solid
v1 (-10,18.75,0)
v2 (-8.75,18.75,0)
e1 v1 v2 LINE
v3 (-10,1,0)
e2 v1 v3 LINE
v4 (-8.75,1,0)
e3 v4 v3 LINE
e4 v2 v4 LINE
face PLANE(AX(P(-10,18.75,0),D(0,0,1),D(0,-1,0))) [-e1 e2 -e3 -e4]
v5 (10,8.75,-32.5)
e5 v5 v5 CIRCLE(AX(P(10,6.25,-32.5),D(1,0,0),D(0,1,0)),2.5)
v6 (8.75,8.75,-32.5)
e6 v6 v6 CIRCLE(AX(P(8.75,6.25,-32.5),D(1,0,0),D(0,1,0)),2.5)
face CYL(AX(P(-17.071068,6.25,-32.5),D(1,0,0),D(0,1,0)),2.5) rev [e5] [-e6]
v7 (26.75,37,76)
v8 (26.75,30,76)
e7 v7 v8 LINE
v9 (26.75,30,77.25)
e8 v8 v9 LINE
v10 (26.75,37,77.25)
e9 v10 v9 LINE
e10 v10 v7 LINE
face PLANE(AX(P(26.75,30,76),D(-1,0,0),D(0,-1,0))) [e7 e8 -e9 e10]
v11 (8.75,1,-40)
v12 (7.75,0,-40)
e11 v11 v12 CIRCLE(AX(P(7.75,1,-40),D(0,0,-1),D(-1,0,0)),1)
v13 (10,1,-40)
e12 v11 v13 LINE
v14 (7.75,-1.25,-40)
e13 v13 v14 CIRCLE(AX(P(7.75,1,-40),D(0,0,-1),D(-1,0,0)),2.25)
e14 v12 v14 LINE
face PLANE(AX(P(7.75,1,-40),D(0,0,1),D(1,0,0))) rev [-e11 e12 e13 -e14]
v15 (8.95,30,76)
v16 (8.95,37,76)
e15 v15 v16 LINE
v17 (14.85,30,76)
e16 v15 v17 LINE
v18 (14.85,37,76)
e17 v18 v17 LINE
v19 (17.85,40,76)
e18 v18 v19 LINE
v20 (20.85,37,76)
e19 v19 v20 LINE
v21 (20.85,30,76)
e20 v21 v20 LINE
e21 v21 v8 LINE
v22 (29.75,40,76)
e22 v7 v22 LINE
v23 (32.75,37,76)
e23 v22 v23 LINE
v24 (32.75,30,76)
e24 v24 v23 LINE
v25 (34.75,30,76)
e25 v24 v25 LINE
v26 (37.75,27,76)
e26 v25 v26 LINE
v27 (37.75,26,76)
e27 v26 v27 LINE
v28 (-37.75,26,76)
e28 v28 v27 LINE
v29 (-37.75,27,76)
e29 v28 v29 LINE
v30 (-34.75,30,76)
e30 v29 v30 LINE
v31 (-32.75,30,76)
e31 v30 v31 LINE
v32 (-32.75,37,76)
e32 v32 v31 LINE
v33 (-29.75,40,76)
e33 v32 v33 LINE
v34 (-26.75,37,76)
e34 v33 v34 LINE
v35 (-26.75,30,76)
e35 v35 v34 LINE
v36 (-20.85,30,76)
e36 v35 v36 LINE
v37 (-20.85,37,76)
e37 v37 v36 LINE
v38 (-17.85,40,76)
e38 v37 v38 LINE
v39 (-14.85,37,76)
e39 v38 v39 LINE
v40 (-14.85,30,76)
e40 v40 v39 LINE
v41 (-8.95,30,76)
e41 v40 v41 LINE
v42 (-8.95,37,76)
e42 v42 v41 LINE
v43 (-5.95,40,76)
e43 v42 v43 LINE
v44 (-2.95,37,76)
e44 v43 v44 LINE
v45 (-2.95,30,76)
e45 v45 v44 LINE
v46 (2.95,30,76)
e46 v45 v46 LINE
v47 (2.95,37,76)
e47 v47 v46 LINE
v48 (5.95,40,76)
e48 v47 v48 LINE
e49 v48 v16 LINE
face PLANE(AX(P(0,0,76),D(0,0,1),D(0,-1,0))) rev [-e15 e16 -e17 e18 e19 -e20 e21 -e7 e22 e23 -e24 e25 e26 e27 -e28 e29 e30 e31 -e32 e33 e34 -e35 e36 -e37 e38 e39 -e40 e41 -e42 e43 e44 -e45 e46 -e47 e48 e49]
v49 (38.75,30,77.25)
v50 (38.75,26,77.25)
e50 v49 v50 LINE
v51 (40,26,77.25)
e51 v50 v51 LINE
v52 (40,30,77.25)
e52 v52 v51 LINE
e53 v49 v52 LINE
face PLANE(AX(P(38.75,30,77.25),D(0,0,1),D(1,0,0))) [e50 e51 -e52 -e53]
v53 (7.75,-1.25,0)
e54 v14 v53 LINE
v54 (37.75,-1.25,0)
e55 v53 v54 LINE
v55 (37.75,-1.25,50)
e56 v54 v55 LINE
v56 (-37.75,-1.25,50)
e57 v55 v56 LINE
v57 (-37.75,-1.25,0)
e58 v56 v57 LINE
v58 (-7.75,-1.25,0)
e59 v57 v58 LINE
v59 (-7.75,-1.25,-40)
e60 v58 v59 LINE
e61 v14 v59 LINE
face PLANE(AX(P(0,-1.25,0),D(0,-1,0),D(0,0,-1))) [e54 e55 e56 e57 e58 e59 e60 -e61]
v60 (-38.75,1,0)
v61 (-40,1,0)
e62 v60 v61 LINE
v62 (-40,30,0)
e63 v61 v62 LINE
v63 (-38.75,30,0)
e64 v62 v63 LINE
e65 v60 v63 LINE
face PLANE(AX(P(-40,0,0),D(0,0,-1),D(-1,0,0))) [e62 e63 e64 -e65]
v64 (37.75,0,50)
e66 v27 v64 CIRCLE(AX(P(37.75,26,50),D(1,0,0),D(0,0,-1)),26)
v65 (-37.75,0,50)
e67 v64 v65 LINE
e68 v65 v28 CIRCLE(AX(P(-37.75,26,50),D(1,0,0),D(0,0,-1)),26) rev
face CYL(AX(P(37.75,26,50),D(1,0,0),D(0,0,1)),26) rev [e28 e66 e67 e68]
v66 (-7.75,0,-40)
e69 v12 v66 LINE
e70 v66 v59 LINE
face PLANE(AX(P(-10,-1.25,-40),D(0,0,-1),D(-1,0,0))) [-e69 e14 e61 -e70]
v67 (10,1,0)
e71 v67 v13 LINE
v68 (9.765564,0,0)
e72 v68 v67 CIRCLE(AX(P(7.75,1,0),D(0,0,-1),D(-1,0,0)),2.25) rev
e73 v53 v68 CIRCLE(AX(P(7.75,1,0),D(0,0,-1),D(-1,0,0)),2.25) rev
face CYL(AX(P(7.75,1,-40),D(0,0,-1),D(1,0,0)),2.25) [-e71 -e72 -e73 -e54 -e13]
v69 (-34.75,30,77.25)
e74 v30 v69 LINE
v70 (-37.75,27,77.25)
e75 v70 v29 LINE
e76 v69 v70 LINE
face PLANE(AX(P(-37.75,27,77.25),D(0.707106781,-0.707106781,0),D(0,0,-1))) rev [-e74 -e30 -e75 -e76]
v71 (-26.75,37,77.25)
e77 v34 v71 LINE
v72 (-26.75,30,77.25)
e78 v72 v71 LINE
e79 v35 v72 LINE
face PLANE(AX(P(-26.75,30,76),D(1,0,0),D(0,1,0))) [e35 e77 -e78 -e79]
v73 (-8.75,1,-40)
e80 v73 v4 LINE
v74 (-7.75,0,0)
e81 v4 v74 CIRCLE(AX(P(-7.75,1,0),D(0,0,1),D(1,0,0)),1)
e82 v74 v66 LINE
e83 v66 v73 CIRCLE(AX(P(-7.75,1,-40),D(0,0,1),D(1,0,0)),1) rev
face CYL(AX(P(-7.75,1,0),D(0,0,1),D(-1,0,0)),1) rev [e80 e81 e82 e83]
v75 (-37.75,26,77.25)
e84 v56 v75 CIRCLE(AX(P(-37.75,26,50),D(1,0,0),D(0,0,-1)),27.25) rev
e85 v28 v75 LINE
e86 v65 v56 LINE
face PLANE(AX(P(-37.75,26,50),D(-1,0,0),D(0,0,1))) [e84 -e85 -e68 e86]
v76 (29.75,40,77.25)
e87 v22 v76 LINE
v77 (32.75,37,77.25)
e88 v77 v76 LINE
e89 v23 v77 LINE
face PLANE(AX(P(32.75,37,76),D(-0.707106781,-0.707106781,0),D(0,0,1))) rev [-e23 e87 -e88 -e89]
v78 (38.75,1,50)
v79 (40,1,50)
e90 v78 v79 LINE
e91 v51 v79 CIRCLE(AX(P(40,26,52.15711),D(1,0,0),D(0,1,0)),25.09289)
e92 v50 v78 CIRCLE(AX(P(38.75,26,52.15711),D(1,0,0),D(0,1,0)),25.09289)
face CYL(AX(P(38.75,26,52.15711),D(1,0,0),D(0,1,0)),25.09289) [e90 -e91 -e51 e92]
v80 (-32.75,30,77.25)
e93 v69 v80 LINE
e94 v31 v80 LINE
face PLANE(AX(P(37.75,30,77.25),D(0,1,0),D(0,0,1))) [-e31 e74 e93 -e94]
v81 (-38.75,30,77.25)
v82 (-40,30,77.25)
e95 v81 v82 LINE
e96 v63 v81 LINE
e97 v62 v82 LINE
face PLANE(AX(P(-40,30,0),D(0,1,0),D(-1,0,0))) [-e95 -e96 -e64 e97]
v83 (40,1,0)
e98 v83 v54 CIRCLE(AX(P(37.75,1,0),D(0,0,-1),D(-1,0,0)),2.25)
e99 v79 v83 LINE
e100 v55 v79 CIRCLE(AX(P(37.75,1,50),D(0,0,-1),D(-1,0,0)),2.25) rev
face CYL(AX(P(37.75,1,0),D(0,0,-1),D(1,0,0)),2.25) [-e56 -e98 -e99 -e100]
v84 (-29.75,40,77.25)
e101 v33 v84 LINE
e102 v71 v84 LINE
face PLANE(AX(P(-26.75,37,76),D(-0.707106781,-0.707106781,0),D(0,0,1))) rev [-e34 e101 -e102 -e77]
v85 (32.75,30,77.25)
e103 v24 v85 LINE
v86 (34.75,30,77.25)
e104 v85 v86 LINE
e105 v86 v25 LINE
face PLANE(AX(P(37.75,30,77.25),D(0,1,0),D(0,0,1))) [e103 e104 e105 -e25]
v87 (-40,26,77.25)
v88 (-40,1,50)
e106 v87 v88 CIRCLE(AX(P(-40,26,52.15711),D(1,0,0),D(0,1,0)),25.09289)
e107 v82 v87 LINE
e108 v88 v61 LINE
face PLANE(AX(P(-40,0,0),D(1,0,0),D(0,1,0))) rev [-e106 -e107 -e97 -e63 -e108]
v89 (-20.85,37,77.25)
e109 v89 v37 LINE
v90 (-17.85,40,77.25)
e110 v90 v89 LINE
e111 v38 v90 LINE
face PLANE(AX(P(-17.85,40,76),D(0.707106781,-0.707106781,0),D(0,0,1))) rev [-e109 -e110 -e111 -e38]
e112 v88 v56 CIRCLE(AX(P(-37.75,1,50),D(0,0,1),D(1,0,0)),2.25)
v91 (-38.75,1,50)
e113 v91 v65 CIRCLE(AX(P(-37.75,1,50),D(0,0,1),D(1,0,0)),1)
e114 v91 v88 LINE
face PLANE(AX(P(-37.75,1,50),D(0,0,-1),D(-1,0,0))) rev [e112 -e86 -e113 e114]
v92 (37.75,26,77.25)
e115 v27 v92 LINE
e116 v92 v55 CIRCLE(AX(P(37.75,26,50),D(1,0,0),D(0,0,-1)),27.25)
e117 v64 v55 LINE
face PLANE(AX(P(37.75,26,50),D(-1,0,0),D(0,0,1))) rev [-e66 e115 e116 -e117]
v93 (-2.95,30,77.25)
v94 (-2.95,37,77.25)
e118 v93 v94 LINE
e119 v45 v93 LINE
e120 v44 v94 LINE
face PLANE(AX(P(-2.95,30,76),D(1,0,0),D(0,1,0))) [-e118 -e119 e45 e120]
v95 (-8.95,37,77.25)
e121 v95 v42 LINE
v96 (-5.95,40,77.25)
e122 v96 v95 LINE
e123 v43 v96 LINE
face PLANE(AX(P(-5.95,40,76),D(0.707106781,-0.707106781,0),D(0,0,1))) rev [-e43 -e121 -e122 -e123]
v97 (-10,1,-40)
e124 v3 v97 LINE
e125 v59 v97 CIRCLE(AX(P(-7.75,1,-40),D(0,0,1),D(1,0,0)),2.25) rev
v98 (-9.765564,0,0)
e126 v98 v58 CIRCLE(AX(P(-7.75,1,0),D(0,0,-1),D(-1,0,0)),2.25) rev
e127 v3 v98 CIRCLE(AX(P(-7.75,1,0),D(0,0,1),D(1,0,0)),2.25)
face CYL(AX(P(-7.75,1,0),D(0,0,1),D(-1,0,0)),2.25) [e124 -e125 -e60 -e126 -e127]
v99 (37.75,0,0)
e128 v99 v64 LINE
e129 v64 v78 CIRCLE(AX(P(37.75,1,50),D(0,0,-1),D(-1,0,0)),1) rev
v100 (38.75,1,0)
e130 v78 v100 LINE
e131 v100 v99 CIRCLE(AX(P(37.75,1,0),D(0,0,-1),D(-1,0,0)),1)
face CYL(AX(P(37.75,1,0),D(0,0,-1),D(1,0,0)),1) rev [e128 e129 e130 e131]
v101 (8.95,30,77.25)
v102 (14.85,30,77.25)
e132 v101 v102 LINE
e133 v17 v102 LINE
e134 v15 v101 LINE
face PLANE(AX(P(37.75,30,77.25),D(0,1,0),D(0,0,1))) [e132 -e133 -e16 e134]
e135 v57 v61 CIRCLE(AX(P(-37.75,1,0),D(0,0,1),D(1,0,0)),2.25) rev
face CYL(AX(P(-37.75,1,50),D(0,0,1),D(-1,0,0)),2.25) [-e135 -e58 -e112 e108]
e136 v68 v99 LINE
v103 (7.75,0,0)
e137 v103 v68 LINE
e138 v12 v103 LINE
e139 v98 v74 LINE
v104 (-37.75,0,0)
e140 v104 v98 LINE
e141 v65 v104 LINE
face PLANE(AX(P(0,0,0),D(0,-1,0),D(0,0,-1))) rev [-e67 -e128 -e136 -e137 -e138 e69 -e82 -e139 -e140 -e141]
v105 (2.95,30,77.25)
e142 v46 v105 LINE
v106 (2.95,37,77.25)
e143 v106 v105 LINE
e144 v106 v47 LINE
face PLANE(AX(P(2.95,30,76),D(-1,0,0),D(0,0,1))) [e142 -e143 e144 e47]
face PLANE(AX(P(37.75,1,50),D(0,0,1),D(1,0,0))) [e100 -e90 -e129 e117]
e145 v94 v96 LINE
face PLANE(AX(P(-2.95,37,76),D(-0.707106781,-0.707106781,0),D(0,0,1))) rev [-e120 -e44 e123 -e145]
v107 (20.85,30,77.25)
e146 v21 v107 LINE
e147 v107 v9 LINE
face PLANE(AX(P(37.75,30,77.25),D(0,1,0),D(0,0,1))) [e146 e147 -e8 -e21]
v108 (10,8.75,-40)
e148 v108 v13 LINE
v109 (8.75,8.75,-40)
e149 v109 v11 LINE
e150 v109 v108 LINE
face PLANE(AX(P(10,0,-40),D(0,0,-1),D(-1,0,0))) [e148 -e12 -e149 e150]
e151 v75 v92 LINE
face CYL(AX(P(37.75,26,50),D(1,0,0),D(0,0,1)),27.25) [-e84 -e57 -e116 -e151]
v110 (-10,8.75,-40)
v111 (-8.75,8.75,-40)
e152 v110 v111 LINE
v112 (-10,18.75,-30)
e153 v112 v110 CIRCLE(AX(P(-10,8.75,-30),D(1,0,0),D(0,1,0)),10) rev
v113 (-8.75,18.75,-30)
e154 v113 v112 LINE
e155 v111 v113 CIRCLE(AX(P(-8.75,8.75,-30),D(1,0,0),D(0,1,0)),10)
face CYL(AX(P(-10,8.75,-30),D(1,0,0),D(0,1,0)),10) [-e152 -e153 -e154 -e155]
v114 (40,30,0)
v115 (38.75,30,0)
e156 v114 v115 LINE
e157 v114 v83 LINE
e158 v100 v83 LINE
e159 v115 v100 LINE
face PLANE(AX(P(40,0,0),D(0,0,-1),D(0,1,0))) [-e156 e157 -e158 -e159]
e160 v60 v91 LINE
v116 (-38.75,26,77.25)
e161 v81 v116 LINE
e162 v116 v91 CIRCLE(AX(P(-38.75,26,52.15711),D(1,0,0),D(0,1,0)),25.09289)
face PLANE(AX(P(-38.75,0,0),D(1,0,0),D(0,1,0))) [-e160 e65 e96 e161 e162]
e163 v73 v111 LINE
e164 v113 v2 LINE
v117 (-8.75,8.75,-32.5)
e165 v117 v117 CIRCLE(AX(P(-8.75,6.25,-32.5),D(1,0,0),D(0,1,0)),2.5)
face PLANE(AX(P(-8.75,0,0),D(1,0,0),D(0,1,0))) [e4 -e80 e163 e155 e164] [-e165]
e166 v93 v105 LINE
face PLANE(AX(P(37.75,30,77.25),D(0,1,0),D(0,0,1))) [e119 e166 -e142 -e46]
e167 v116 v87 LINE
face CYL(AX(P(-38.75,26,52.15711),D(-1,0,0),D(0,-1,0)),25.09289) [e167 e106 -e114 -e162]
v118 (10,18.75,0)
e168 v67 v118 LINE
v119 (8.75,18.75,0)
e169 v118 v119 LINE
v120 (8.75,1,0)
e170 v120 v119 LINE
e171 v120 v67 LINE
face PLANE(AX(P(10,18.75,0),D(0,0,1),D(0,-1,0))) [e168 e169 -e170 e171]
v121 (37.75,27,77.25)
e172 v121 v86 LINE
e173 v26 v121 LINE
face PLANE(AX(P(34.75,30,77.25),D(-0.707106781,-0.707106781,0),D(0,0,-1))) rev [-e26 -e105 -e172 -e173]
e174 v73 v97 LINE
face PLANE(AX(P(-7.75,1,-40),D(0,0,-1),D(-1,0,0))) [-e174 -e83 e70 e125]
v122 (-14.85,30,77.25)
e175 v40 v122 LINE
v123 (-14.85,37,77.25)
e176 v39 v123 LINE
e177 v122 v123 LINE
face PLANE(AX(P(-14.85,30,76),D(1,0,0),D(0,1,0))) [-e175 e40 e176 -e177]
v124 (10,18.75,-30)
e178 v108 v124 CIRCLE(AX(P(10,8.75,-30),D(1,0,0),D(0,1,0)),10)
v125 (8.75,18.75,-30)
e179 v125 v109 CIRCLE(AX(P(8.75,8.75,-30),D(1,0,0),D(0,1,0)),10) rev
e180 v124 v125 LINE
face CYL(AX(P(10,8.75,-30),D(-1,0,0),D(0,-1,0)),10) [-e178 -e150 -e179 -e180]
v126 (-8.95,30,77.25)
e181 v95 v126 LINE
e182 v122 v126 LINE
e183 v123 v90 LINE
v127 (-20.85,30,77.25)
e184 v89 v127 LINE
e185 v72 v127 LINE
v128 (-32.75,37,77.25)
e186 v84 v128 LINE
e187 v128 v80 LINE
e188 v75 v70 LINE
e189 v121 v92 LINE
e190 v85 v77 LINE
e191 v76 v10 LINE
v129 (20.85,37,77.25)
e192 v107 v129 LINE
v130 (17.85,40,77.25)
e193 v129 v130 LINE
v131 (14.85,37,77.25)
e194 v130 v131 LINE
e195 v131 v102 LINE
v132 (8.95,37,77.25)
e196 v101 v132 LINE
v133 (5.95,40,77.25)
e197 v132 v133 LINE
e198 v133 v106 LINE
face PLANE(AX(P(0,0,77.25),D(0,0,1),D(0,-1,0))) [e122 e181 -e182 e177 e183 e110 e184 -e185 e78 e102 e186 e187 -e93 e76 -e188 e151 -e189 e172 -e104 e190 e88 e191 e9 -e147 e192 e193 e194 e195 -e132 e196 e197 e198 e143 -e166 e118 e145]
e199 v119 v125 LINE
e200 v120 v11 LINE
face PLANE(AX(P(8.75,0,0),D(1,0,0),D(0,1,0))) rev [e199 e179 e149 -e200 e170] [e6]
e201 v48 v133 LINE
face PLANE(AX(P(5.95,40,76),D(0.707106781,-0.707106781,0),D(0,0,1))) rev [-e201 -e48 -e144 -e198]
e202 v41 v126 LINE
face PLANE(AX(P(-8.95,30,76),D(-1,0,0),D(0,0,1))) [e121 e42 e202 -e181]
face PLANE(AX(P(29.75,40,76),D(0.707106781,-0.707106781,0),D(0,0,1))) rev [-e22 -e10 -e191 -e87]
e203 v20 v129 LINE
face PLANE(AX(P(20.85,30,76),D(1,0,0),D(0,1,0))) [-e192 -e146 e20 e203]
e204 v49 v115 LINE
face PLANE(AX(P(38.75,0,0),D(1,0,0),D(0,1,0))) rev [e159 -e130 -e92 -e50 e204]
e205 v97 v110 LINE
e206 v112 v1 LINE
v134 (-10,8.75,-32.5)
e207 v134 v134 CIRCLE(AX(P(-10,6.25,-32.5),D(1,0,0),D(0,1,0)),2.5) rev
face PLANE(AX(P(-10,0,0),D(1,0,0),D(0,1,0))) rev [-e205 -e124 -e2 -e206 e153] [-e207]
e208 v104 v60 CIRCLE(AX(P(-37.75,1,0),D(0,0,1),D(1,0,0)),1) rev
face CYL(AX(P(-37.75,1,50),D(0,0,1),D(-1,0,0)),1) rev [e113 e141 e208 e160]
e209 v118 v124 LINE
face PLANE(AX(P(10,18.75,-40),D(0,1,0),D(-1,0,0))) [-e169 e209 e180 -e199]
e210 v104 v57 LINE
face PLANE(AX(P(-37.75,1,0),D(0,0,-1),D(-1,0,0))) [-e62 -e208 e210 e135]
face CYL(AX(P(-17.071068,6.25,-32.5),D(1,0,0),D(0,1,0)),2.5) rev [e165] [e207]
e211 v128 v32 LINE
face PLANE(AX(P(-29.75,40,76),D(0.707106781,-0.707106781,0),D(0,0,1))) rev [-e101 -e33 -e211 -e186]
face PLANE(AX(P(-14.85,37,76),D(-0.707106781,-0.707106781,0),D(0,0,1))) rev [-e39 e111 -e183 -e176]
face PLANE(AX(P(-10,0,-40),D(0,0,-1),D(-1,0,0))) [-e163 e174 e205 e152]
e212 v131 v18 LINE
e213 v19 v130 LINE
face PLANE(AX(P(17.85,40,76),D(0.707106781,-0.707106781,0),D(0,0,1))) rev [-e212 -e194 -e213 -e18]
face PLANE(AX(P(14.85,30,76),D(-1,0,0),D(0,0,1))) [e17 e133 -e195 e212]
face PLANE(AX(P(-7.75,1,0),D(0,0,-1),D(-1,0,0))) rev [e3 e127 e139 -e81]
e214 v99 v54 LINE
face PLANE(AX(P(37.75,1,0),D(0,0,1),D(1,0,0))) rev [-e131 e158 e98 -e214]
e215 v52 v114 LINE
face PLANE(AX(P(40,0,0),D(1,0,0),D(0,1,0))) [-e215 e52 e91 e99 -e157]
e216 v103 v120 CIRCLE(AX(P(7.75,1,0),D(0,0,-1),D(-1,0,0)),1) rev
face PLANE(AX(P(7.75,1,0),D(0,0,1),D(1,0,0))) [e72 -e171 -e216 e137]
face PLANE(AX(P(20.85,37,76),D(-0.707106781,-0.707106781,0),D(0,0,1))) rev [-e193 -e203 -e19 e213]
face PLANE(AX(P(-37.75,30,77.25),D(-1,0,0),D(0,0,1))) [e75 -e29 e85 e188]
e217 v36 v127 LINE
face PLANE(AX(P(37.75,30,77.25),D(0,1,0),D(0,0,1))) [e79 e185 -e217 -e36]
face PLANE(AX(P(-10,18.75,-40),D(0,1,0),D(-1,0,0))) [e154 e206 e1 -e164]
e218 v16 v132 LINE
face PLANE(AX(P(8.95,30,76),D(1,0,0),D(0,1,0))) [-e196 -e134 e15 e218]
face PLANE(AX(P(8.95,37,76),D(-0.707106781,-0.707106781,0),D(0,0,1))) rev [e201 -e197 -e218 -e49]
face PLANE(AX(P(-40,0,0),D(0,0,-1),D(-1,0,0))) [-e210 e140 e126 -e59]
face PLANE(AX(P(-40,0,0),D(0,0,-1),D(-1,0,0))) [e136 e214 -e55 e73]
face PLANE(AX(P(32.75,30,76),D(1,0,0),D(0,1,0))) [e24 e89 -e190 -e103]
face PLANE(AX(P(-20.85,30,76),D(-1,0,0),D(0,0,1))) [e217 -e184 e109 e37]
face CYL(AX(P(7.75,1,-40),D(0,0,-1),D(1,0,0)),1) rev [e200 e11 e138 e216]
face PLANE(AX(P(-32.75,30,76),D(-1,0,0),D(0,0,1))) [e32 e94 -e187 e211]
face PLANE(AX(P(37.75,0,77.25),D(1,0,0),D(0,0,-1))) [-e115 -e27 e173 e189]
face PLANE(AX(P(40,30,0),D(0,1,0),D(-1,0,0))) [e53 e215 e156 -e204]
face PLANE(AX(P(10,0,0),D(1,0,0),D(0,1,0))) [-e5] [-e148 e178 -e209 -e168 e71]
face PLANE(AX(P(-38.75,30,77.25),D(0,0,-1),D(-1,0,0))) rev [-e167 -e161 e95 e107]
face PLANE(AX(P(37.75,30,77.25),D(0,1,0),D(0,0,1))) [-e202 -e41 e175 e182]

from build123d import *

# Parameters (mm, degrees)
SKETCH1_W                      = 20
SKETCH1_H                      = 40
BASE_FLANGE1_DEPTH             = 1.25
EDGE_FLANGE1_STRIP_W           = 7
EDGE_FLANGE1_STRIP_H           = 1.25
EDGE_FLANGE1_STRIP_CUT_DEPTH   = 40
EDGE_FLANGE1_STRIP_2_W         = 7
EDGE_FLANGE1_STRIP_2_H         = 1.25
EDGE_FLANGE1_STRIP_CUT_2_DEPTH = 40
EDGE_FLANGE1_DEPTH             = 40
EDGE_FLANGE1_BEND_DEPTH        = 40
SKETCH12_W                     = 80
SKETCH12_H                     = 50
TAB1_DEPTH                     = 1.25
EDGE_FLANGE2_STRIP_W           = 7
EDGE_FLANGE2_STRIP_H           = 1.25
EDGE_FLANGE2_STRIP_CUT_DEPTH   = 50
EDGE_FLANGE2_STRIP_2_W         = 7
EDGE_FLANGE2_STRIP_2_H         = 1.25
EDGE_FLANGE2_STRIP_CUT_2_DEPTH = 50
EDGE_FLANGE2_DEPTH             = 50
EDGE_FLANGE2_BEND_DEPTH        = 50
EDGE_FLANGE3_DEPTH             = 75.5
TAB2_DEPTH                     = 1.25
SKETCH27_W                     = 6
SKETCH27_H                     = 10
TAB3_DEPTH                     = 1.25
BREAK_CORNER1_START            = 76
BREAK_CORNER1_DEPTH            = 1.25
CUT_EXTRUDE1_REACH             = 102.337
SKETCH30_R                     = 2.5
FILLET1_R                      = 10


# Read off the part's stored shape, not the designer's step: Break-Corner1
# Sheet-metal steps are written as plain solids
with BuildPart() as part:
    # Sketch1 → Base-Flange1 (new body)
    with BuildSketch(Plane(origin=(0, 0, 0), x_dir=(1, 0, 0), z_dir=(0, 1, 0))):
        with Locations((0, 20)):
            Rectangle(SKETCH1_W, SKETCH1_H)
    extrude(amount=-BASE_FLANGE1_DEPTH)

    # Edge-Flange1 strip (across the edge) → Edge-Flange1 strip cut (cut)
    with BuildSketch(Plane(origin=(10, 0, 0), x_dir=(-1, 0, 0), z_dir=(0, 0, -1))):
        with Locations((-1.25, -0.625)):
            Rectangle(EDGE_FLANGE1_STRIP_W, EDGE_FLANGE1_STRIP_H)
    extrude(amount=EDGE_FLANGE1_STRIP_CUT_DEPTH, mode=Mode.SUBTRACT)

    # Edge-Flange1 strip 2 (across the edge) → Edge-Flange1 strip cut 2 (cut)
    with BuildSketch(Plane(origin=(-10, 0, -40), x_dir=(1, 0, 0), z_dir=(0, 0, 1))):
        with Locations((-1.25, -0.625)):
            Rectangle(EDGE_FLANGE1_STRIP_2_W, EDGE_FLANGE1_STRIP_2_H)
    extrude(amount=EDGE_FLANGE1_STRIP_CUT_2_DEPTH, mode=Mode.SUBTRACT)

    # Edge-Flange1 section (across the edge) → Edge-Flange1 (add)
    with BuildSketch(Plane(origin=(10, 0, 0), x_dir=(-1, 0, 0), z_dir=(0, 0, -1))):
        with BuildLine():
            Line((0, 1), (0, 18.75))
            Line((0, 18.75), (1.25, 18.75))
            Line((1.25, 18.75), (1.25, 1))
            ThreePointArc((1.25, 1), (1.542893219, 0.292893219), (2.25, 0))
            Line((2.25, 0), (2.25, -1.25))
            ThreePointArc((2.25, -1.25), (0.659009742, -0.590990258), (0, 1))
        make_face()
    extrude(amount=EDGE_FLANGE1_DEPTH)

    # Edge-Flange1 section 2 (across the edge) → Edge-Flange1 bend (add)
    with BuildSketch(Plane(origin=(-10, 0, -40), x_dir=(1, 0, 0), z_dir=(0, 0, 1))):
        with BuildLine():
            Line((0, 1), (0, 18.75))
            Line((0, 18.75), (1.25, 18.75))
            Line((1.25, 18.75), (1.25, 1))
            ThreePointArc((1.25, 1), (1.542893219, 0.292893219), (2.25, 0))
            Line((2.25, 0), (2.25, -1.25))
            ThreePointArc((2.25, -1.25), (0.659009742, -0.590990258), (0, 1))
        make_face()
    extrude(amount=EDGE_FLANGE1_BEND_DEPTH)

    # Sketch12 → Tab1 (add)
    with BuildSketch(Plane.XZ.offset(1.25)):
        with Locations((0, 25)):
            Rectangle(SKETCH12_W, SKETCH12_H)
    extrude(amount=-TAB1_DEPTH)

    # Edge-Flange2 strip (across the edge) → Edge-Flange2 strip cut (cut)
    with BuildSketch(Plane(origin=(40, 0, 50), x_dir=(-1, 0, 0), z_dir=(0, 0, -1))):
        with Locations((-1.25, -0.625)):
            Rectangle(EDGE_FLANGE2_STRIP_W, EDGE_FLANGE2_STRIP_H)
    extrude(amount=EDGE_FLANGE2_STRIP_CUT_DEPTH, mode=Mode.SUBTRACT)

    # Edge-Flange2 strip 2 (across the edge) → Edge-Flange2 strip cut 2 (cut)
    with BuildSketch(Plane(origin=(-40, 0, 0), x_dir=(1, 0, 0), z_dir=(0, 0, 1))):
        with Locations((-1.25, -0.625)):
            Rectangle(EDGE_FLANGE2_STRIP_2_W, EDGE_FLANGE2_STRIP_2_H)
    extrude(amount=EDGE_FLANGE2_STRIP_CUT_2_DEPTH, mode=Mode.SUBTRACT)

    # Edge-Flange2 section (across the edge) → Edge-Flange2 (add)
    with BuildSketch(Plane(origin=(40, 0, 50), x_dir=(-1, 0, 0), z_dir=(0, 0, -1))):
        with BuildLine():
            Line((0, 1), (0, 30))
            Line((0, 30), (1.25, 30))
            Line((1.25, 30), (1.25, 1))
            ThreePointArc((1.25, 1), (1.542893219, 0.292893219), (2.25, 0))
            Line((2.25, 0), (2.25, -1.25))
            ThreePointArc((2.25, -1.25), (0.659009742, -0.590990258), (0, 1))
        make_face()
    extrude(amount=EDGE_FLANGE2_DEPTH)

    # Edge-Flange2 section 2 (across the edge) → Edge-Flange2 bend (add)
    with BuildSketch(Plane(origin=(-40, 0, 0), x_dir=(1, 0, 0), z_dir=(0, 0, 1))):
        with BuildLine():
            Line((0, 1), (0, 30))
            Line((0, 30), (1.25, 30))
            Line((1.25, 30), (1.25, 1))
            ThreePointArc((1.25, 1), (1.542893219, 0.292893219), (2.25, 0))
            Line((2.25, 0), (2.25, -1.25))
            ThreePointArc((2.25, -1.25), (0.659009742, -0.590990258), (0, 1))
        make_face()
    extrude(amount=EDGE_FLANGE2_BEND_DEPTH)

    # Edge-Flange3 section (across the edge) → Edge-Flange3 (add)
    with BuildSketch(Plane(origin=(-37.75, 0, 76), x_dir=(0, 0, -1), z_dir=(1, 0, 0))):
        with BuildLine():
            Line((-1.25, 26), (-1.25, 30))
            Line((-1.25, 30), (0, 30))
            Line((0, 30), (0, 26))
            ThreePointArc((0, 26), (7.615223689, 7.615223689), (26, 0))
            Line((26, 0), (26, -1.25))
            ThreePointArc((26, -1.25), (6.731340213, 6.731340213), (-1.25, 26))
        make_face()
    extrude(amount=EDGE_FLANGE3_DEPTH)

    # Sketch24 → Tab2 (add)
    with BuildSketch(Plane(origin=(40, 0, 0), x_dir=(0, 0, -1), z_dir=(1, 0, 0))):
        with BuildLine():
            Line((-50, 30), (-77.25, 30))
            Line((-77.25, 30), (-77.25, 26))
            ThreePointArc((-77.25, 26), (-69.120673955, 7.509715389), (-50, 1))
            Line((-50, 1), (-50, 30))
        make_face()
    tab2 = extrude(amount=-TAB2_DEPTH)

    # Mirror1: Tab2 across plane
    add(tab2.mirror(Plane(origin=(0, 0, 0), x_dir=(0, 0, 1), z_dir=(1, 0, 0))))

    # Sketch27 → Tab3 (add)
    with BuildSketch(Plane.XY.offset(77.25)):
        with Locations((-29.75, 35)):
            Rectangle(SKETCH27_W, SKETCH27_H)
        with Locations((-17.85, 35)):
            Rectangle(SKETCH27_W, SKETCH27_H)
        with Locations((-5.95, 35)):
            Rectangle(SKETCH27_W, SKETCH27_H)
        with Locations((5.95, 35)):
            Rectangle(SKETCH27_W, SKETCH27_H)
        with Locations((17.85, 35)):
            Rectangle(SKETCH27_W, SKETCH27_H)
        with Locations((29.75, 35)):
            Rectangle(SKETCH27_W, SKETCH27_H)
    extrude(amount=-TAB3_DEPTH)

    # Break-Corner1 outline → Break-Corner1 (cut)
    with BuildSketch(Plane.XY.offset(BREAK_CORNER1_START)):
        Polygon((-37.75, 30), (-37.75, 27), (-34.75, 30), align=None)
        Polygon((-26.75, 40), (-29.75, 40), (-26.75, 37), align=None)
        Polygon((-32.75, 40), (-32.75, 37), (-29.75, 40), align=None)
        Polygon((-20.85, 40), (-20.85, 37), (-17.85, 40), align=None)
        Polygon((-14.85, 40), (-17.85, 40), (-14.85, 37), align=None)
        Polygon((-8.95, 40), (-8.95, 37), (-5.95, 40), align=None)
        Polygon((-2.95, 40), (-5.95, 40), (-2.95, 37), align=None)
        Polygon((2.95, 40), (2.95, 37), (5.95, 40), align=None)
        Polygon((8.95, 40), (5.95, 40), (8.95, 37), align=None)
        Polygon((14.85, 40), (14.85, 37), (17.85, 40), align=None)
        Polygon((20.85, 40), (17.85, 40), (20.85, 37), align=None)
        Polygon((26.75, 40), (26.75, 37), (29.75, 40), align=None)
        Polygon((37.75, 30), (34.75, 30), (37.75, 27), align=None)
        Polygon((32.75, 40), (29.75, 40), (32.75, 37), align=None)
    extrude(amount=BREAK_CORNER1_DEPTH, mode=Mode.SUBTRACT)

    # Cut-Extrude1: up to this face of the body (flat: up to its plane)
    cut_extrude1_end = Plane(part.part.faces().sort_by_distance((-10, 9.875, -20))[0])
    # Sketch30 → Cut-Extrude1 (cut, up to the picked face)
    with BuildSketch(Plane(origin=(10, 0, 0), x_dir=(0, 0, -1), z_dir=(1, 0, 0)), mode=Mode.PRIVATE) as cut_extrude1_sk1:
        with Locations(Location((32.5, 6.25, 0), (0, 0, 90))):
            Circle(SKETCH30_R)
    cut_extrude1_tool1 = split(extrude(cut_extrude1_sk1.sketch, amount=-CUT_EXTRUDE1_REACH, mode=Mode.PRIVATE), bisect_by=cut_extrude1_end, keep=Keep.BOTH, mode=Mode.PRIVATE)
    add(cut_extrude1_tool1.solids().sort_by(Axis((10, 6.25, -32.5), (-1, 0, 0)))[0], mode=Mode.SUBTRACT)

    # Fillet1
    fillet1_edges = [part.edges().sort_by_distance(p)[0] for p in [
        (9.375, 18.75, -40),
        (-9.375, 18.75, -40),
    ]]
    fillet(fillet1_edges, radius=FILLET1_R)


solid = part.part
